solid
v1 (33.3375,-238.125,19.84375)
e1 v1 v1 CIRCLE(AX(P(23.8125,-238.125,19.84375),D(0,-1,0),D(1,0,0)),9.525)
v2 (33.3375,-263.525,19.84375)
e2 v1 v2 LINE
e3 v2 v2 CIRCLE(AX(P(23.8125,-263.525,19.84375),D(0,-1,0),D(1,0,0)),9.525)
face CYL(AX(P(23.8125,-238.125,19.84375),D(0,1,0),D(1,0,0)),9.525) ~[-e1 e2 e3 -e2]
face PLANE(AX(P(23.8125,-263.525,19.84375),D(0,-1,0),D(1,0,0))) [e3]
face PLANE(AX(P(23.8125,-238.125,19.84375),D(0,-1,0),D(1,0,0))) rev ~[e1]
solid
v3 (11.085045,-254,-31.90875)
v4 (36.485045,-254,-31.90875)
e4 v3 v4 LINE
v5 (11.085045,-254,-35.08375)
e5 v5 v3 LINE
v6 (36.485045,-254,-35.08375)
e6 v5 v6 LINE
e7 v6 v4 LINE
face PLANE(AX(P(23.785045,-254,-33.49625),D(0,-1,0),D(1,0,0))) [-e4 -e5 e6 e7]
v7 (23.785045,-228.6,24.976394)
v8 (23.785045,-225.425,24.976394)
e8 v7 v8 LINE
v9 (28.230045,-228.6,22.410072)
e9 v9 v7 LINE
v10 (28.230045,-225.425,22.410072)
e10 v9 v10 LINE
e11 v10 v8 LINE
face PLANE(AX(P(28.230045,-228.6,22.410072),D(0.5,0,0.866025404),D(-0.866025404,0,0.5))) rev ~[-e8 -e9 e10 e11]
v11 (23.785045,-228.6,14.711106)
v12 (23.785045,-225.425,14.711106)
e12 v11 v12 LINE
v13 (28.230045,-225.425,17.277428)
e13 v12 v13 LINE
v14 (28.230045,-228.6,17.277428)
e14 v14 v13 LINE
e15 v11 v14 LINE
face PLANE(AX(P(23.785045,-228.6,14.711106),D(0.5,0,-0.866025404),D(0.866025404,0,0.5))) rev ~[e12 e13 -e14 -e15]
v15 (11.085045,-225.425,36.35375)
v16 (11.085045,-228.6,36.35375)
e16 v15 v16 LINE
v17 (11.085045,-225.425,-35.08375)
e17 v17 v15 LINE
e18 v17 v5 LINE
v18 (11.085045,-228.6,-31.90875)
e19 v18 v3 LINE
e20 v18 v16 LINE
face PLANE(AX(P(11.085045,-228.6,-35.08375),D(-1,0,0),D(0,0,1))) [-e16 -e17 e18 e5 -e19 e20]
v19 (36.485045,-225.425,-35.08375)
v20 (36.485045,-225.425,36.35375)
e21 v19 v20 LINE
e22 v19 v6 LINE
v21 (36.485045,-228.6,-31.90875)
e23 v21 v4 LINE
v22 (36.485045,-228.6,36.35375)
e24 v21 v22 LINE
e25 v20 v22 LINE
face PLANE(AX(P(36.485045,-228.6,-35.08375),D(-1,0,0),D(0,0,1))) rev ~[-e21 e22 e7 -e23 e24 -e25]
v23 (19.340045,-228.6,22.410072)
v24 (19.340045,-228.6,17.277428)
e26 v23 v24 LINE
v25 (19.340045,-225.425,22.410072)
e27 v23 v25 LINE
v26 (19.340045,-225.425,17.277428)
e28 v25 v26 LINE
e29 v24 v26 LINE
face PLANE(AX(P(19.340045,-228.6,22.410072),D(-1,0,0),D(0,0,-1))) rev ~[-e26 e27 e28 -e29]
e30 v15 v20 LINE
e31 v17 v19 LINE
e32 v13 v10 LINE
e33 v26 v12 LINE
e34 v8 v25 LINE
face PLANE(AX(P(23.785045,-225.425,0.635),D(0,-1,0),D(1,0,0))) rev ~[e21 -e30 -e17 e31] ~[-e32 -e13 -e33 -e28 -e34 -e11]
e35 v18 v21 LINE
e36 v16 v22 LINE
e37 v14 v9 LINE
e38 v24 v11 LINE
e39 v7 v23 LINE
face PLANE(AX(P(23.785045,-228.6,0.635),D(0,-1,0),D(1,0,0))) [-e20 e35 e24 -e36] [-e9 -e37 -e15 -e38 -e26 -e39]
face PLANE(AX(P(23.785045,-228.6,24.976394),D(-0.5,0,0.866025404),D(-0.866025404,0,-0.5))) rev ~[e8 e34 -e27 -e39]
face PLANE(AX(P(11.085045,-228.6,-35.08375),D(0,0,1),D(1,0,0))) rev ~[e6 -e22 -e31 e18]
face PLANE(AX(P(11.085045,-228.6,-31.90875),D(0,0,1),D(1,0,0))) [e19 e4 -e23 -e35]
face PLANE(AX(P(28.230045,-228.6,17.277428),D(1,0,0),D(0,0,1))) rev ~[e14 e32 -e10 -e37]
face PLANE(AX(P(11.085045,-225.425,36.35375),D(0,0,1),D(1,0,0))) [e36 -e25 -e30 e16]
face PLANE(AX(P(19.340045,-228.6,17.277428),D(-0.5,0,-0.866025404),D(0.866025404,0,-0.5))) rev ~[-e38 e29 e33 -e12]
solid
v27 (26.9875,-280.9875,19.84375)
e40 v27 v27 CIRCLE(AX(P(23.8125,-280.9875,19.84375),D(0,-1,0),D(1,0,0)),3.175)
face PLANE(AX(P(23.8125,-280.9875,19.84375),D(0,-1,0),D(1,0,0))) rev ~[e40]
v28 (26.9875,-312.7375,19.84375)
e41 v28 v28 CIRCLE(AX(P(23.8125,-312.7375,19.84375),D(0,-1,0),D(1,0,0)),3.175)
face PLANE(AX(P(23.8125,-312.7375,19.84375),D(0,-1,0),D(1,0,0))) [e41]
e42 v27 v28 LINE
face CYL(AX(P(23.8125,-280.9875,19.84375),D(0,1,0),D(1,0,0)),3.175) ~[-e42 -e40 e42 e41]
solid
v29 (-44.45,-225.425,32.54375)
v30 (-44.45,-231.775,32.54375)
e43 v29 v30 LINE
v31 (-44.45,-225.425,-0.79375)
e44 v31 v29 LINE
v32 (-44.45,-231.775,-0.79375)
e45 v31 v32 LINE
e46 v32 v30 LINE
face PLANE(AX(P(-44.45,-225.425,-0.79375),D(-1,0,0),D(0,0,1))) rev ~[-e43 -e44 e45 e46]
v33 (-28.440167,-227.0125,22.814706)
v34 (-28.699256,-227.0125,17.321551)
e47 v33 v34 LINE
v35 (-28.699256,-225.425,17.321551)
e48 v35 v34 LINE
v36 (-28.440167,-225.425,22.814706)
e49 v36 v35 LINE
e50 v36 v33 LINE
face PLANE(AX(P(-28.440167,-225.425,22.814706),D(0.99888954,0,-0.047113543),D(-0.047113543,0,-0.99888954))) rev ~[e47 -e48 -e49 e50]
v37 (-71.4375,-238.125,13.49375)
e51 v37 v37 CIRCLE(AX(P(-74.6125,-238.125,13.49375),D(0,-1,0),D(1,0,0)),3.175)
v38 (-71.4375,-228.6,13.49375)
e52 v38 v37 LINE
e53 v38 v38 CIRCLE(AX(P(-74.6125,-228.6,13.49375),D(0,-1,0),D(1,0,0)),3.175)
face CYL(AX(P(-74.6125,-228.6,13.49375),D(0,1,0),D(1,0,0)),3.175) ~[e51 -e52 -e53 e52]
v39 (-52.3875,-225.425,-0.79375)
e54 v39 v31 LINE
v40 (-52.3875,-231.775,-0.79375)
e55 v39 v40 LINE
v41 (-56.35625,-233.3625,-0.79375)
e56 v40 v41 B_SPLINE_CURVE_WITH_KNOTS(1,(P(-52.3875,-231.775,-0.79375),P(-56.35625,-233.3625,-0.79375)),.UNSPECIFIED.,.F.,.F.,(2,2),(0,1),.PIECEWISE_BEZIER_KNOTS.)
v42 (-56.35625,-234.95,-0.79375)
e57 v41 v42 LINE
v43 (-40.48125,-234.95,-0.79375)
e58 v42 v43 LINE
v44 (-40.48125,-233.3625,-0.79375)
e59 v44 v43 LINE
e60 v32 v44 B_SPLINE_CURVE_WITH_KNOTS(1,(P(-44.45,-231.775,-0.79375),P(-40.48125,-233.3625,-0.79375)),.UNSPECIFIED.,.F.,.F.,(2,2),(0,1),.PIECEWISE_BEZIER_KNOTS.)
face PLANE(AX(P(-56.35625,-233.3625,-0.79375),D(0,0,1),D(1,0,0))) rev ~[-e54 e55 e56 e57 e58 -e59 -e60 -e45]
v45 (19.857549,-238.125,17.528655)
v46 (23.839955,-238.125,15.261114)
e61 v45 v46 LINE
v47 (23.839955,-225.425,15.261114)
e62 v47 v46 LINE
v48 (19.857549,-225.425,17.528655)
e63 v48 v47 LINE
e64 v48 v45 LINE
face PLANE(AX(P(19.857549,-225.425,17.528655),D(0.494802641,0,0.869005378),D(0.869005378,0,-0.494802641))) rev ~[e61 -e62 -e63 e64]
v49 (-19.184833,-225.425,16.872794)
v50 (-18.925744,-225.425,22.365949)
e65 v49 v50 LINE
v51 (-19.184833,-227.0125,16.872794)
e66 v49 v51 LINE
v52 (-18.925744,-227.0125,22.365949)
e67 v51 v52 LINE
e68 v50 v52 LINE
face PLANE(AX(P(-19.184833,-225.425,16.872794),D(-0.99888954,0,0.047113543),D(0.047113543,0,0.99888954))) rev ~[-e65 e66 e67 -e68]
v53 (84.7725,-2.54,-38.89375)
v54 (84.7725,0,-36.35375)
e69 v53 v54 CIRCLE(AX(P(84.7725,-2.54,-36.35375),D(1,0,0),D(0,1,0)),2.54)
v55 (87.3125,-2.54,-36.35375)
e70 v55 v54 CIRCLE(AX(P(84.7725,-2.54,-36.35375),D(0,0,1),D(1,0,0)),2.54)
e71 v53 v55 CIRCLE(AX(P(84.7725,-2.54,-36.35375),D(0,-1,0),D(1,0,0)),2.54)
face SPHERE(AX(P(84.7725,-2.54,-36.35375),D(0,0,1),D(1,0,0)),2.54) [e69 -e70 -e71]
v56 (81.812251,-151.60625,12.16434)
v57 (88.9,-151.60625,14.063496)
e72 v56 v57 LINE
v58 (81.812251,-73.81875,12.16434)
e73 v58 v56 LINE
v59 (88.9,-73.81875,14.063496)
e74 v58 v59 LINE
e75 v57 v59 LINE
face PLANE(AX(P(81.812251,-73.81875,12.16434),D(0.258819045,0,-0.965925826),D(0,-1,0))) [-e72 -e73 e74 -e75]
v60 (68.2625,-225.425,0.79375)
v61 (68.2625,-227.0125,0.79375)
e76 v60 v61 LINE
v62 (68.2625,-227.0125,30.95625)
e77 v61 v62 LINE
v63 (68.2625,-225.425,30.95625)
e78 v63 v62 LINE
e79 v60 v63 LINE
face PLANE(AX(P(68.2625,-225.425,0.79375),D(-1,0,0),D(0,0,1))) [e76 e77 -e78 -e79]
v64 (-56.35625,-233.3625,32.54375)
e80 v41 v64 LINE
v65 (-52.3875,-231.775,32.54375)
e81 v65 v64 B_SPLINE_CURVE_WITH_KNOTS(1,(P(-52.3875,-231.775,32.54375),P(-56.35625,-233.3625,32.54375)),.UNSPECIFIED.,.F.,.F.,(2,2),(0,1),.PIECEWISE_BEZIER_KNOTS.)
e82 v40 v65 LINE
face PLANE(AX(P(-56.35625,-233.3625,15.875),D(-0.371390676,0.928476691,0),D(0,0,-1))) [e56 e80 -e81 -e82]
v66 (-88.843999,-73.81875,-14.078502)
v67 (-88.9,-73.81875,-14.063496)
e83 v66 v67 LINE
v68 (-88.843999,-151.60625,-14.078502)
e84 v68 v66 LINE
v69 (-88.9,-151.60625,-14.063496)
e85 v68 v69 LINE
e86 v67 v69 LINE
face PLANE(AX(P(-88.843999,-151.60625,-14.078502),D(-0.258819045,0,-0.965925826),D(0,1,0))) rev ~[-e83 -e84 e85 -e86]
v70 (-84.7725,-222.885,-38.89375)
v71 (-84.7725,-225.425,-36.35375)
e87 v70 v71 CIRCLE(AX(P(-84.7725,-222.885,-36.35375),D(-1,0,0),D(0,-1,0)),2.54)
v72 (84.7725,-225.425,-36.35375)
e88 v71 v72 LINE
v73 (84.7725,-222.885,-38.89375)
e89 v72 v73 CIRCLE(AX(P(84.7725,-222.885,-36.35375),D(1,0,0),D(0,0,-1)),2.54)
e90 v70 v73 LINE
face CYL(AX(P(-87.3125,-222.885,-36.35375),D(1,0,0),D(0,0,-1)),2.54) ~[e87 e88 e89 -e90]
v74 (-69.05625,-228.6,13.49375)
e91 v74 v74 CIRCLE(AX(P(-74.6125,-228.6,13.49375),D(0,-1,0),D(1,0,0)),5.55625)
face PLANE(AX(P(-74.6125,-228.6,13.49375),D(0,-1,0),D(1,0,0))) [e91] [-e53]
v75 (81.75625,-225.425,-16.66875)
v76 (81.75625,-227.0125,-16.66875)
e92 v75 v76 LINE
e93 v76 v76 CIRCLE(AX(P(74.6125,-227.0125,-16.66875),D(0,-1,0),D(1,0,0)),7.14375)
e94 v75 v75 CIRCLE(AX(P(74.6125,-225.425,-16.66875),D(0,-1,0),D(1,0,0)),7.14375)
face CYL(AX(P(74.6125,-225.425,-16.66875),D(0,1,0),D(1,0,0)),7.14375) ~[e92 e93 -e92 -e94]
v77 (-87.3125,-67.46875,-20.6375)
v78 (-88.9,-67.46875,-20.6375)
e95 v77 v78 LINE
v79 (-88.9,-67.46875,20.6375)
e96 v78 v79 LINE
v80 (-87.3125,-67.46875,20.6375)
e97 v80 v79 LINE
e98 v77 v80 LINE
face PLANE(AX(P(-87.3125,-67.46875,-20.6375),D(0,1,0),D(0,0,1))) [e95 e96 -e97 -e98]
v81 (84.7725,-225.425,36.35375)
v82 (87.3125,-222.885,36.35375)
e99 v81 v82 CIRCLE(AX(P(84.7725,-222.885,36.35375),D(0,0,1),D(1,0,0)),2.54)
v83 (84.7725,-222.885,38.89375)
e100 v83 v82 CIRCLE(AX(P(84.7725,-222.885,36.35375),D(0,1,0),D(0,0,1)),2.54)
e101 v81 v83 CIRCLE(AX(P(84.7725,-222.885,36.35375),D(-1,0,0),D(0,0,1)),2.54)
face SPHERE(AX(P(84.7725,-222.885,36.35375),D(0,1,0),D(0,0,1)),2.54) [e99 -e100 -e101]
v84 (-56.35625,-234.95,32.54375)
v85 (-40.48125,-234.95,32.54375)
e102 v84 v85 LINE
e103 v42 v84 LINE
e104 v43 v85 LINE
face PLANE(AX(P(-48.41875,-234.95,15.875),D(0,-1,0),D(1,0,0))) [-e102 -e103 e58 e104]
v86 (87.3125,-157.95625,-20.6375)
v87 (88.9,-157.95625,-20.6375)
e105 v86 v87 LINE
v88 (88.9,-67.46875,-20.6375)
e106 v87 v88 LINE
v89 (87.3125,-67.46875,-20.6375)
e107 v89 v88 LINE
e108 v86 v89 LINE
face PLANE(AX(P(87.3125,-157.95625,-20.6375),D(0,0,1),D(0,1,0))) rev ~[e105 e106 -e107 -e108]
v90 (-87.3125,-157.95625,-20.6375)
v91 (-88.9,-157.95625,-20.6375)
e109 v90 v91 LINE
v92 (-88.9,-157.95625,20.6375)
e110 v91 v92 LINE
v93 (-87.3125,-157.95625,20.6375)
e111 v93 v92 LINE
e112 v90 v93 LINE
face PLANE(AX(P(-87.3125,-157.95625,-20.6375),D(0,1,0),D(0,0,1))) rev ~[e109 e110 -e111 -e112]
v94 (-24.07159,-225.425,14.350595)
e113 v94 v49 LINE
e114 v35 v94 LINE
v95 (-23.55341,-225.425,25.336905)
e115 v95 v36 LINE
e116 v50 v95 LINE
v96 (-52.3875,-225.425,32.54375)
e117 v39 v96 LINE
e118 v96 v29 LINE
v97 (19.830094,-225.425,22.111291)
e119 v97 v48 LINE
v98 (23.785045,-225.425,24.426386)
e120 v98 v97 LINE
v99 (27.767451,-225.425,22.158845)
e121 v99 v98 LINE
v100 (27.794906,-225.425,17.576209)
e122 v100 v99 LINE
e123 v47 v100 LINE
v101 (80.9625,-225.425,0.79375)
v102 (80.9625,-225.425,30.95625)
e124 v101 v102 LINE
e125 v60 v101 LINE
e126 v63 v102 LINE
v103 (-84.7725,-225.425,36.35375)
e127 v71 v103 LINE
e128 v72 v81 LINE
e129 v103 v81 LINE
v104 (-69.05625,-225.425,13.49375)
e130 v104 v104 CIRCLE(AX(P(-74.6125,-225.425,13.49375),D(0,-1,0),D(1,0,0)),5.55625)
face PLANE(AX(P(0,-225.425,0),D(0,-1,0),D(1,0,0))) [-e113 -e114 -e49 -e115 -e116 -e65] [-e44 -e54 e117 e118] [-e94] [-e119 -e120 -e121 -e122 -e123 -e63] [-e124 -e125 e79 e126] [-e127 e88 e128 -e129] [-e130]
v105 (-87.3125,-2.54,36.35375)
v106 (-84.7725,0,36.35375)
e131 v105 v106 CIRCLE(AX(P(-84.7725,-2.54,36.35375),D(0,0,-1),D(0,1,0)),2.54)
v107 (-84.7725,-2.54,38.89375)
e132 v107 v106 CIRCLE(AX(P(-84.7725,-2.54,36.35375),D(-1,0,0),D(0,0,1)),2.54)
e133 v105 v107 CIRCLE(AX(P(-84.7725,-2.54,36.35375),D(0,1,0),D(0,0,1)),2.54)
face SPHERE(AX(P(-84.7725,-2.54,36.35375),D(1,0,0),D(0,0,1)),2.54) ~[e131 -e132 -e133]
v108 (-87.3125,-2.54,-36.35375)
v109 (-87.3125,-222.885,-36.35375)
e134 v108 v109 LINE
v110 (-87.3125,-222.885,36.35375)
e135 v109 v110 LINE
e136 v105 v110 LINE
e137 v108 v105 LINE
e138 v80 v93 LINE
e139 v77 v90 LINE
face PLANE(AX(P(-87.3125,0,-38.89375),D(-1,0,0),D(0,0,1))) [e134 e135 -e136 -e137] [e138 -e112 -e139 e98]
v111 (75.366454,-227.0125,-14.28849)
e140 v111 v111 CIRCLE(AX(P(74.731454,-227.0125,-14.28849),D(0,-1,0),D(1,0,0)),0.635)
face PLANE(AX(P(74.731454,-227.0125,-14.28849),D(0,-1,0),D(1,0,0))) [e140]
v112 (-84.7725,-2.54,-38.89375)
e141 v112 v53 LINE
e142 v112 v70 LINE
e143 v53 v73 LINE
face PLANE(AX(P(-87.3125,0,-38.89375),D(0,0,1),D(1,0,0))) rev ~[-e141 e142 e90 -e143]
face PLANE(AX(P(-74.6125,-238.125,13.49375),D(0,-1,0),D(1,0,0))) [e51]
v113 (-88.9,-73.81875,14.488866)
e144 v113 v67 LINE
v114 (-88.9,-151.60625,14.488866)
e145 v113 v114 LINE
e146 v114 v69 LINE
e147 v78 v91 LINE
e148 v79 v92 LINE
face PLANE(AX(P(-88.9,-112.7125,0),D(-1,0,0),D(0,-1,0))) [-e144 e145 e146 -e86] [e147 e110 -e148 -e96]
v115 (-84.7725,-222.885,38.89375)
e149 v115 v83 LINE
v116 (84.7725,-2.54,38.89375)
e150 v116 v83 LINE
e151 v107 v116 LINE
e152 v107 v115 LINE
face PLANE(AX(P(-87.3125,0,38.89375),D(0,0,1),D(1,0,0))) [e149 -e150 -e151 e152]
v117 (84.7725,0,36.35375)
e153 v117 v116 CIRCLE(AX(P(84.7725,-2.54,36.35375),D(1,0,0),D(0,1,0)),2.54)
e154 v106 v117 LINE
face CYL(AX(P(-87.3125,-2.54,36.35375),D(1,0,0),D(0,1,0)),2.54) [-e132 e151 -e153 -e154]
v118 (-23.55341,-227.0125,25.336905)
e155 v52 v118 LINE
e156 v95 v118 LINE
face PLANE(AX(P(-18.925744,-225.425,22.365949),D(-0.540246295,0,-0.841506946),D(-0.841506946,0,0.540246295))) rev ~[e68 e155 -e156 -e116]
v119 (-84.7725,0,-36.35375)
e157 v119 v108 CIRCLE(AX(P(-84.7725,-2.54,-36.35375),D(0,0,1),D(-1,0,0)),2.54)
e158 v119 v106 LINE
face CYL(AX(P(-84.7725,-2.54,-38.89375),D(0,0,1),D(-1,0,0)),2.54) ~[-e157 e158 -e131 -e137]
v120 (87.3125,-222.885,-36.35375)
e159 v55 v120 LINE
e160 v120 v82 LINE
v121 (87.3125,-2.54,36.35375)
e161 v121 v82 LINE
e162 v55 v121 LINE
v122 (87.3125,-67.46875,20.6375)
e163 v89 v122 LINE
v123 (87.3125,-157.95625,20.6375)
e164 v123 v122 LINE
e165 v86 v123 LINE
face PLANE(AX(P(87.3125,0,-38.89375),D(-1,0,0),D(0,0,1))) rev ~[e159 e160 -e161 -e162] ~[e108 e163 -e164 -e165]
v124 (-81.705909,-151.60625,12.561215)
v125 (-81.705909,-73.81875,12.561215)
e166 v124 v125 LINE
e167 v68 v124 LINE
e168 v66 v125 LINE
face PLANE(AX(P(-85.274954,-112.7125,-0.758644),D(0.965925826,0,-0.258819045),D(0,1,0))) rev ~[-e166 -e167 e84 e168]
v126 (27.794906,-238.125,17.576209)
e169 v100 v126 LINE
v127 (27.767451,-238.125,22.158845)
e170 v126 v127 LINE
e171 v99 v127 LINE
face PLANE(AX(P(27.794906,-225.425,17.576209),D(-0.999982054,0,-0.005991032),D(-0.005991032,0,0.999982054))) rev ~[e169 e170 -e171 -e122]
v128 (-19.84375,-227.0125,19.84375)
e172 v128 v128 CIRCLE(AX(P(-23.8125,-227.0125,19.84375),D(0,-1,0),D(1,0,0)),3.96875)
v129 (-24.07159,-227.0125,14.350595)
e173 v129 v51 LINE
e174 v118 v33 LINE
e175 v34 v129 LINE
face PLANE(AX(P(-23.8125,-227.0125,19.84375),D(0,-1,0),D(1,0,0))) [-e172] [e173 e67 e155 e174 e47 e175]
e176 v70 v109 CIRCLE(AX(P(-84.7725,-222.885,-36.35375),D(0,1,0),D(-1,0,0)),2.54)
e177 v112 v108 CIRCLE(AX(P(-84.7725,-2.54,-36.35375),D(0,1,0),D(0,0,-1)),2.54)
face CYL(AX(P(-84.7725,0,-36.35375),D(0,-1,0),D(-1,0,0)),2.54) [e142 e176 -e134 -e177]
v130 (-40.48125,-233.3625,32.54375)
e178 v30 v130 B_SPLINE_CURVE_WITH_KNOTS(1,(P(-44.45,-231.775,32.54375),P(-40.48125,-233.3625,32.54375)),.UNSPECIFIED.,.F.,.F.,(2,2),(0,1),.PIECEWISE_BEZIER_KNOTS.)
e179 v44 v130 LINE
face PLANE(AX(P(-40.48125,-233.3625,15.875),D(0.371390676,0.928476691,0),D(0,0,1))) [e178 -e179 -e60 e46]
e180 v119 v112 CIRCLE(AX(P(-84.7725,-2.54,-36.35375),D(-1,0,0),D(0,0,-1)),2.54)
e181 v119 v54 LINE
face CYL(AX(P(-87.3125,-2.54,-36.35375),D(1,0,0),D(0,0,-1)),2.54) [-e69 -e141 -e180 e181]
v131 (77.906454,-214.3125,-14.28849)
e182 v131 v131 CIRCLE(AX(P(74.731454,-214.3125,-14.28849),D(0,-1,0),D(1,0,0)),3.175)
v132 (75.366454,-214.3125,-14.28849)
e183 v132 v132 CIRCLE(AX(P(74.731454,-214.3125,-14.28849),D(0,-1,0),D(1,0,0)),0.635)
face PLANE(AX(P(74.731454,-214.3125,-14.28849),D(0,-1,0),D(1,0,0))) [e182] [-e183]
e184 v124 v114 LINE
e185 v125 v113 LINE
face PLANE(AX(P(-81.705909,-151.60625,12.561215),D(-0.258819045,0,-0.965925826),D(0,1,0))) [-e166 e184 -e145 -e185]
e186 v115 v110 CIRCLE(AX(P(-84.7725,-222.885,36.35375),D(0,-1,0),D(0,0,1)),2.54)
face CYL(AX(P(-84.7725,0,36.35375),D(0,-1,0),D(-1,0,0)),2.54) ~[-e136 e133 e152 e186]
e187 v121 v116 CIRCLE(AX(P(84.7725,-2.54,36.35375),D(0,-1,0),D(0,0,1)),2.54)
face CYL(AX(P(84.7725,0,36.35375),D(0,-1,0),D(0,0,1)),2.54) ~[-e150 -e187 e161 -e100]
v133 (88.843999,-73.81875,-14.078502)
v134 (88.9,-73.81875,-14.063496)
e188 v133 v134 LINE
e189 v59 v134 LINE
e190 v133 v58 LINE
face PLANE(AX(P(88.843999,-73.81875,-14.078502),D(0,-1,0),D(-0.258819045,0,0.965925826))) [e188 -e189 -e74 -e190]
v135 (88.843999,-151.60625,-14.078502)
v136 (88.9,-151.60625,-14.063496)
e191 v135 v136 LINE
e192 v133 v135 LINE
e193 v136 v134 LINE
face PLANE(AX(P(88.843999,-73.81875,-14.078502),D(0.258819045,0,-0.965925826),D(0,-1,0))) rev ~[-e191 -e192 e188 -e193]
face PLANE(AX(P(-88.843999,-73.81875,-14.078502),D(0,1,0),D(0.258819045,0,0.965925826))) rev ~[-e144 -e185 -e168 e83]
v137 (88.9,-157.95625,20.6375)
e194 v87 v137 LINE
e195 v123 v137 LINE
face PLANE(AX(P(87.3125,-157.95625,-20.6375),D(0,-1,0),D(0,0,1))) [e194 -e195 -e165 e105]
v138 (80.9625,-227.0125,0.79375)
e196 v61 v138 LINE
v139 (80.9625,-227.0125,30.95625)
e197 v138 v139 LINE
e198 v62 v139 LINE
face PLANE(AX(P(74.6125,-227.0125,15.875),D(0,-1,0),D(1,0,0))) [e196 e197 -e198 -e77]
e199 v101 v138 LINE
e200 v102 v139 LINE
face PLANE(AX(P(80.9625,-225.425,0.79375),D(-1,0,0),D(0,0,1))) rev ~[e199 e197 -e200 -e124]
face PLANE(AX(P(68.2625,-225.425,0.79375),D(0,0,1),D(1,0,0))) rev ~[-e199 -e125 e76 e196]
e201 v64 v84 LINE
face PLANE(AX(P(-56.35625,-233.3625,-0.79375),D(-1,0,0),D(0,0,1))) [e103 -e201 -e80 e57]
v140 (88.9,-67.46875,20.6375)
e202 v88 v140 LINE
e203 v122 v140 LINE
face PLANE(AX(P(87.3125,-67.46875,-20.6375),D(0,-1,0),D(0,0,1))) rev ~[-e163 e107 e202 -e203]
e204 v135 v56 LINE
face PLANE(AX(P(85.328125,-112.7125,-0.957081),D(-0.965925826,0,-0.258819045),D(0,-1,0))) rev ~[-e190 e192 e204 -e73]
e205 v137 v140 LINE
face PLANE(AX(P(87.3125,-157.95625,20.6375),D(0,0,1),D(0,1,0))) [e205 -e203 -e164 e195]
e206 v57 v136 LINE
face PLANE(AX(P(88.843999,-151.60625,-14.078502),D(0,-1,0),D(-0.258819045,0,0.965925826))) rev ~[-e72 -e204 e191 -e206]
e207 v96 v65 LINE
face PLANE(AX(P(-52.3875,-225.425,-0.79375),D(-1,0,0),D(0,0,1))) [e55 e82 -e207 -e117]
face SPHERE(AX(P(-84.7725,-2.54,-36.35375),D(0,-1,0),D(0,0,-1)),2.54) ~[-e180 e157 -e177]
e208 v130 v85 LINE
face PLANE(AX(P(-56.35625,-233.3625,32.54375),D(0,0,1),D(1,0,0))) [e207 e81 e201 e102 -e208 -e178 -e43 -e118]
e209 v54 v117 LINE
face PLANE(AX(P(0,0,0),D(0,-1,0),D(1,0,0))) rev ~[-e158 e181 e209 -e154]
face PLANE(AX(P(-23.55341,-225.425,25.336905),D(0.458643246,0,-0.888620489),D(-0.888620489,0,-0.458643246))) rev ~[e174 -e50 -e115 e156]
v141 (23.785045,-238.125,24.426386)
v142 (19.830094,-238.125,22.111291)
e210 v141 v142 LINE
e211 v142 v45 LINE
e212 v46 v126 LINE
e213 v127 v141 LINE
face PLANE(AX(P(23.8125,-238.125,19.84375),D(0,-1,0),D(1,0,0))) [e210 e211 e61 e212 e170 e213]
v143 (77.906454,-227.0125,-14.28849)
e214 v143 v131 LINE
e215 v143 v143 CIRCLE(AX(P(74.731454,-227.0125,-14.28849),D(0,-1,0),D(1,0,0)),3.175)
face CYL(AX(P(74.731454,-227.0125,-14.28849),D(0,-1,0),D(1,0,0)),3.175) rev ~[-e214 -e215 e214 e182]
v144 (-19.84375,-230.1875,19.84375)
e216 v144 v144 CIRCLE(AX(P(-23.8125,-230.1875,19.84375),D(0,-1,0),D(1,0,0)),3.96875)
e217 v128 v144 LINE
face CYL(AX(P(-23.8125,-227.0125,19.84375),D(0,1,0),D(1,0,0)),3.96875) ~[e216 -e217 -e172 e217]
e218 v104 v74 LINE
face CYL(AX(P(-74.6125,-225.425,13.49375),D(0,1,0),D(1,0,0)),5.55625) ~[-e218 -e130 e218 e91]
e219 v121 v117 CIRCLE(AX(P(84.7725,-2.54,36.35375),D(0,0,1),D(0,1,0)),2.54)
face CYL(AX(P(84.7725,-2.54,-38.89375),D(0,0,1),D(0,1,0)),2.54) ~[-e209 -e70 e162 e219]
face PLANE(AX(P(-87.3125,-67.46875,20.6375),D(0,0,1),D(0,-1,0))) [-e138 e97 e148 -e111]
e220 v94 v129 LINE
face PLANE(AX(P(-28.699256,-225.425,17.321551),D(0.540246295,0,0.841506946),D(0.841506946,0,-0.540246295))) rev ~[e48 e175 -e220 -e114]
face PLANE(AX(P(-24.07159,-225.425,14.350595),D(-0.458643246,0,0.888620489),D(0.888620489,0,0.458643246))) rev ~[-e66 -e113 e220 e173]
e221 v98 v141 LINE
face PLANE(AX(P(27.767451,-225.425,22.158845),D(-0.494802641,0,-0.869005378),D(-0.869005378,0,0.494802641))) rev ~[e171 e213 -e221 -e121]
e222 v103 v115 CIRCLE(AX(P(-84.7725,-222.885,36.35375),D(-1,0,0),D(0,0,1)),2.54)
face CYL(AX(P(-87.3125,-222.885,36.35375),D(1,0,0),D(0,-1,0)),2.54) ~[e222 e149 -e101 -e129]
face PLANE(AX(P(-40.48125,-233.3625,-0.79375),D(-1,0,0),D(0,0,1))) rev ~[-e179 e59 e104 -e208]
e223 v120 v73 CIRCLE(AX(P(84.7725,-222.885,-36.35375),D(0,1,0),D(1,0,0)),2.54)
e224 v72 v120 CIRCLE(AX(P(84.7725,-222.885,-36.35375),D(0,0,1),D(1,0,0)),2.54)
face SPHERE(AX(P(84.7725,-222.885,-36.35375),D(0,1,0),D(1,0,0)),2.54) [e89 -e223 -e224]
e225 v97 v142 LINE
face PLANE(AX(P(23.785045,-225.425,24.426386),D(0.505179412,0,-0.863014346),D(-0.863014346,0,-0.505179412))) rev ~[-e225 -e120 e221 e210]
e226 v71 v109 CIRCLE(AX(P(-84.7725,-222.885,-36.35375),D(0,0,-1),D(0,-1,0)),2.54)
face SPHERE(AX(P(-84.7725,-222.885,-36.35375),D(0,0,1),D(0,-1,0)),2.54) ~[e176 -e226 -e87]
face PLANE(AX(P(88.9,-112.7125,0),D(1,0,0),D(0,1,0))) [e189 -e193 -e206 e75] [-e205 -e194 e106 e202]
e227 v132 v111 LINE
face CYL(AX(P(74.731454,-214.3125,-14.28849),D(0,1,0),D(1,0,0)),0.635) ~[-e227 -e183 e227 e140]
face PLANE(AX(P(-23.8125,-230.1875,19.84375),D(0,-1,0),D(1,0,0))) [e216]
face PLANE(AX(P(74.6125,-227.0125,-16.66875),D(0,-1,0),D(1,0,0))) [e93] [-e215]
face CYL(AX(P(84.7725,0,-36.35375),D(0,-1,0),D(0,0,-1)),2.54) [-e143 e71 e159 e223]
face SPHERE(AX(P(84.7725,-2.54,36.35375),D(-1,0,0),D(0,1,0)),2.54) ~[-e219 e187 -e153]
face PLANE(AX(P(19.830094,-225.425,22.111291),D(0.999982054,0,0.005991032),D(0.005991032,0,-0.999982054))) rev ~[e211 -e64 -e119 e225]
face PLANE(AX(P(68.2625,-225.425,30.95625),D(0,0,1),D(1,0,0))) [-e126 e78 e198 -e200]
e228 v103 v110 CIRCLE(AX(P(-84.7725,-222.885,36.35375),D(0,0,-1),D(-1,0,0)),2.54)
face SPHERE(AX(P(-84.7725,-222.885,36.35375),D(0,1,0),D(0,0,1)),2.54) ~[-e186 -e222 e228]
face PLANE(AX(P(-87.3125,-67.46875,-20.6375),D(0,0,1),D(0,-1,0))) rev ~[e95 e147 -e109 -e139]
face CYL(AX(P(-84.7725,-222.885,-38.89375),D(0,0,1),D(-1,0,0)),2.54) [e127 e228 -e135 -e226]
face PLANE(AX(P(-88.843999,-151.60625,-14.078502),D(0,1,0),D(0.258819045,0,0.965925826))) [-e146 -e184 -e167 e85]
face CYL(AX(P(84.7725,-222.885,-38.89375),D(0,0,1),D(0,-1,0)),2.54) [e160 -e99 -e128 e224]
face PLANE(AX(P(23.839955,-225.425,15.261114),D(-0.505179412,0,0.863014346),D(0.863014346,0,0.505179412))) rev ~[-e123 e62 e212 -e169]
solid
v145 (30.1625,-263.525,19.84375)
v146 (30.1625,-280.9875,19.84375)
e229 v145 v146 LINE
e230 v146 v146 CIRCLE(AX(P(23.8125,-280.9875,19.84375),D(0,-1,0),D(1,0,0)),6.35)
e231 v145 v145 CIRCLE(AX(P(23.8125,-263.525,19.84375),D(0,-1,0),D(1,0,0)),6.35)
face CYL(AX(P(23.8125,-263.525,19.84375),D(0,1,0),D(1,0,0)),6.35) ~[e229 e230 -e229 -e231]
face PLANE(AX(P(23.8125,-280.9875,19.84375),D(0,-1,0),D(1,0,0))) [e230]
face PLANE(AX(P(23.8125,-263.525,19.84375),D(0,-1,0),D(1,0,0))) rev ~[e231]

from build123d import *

# Parameters (mm, degrees)
F0_W       = 174.625
F0_H       = 77.7875
F1_DEPTH   = 225.425
F2_W       = 90.4875
F2_H       = 41.275
F3_DEPTH   = 1.5875
F4_W       = 90.4875
F4_H       = 41.275
F5_DEPTH   = 1.5875
F6_R       = 2.54
F9_W       = 77.7875
F9_H       = 27.5794637142
F10_DEPTH  = 25.4
F13_W      = 77.7875
F13_H      = 27.1685884801
F14_DEPTH  = 25.4
F15_R      = 7.14375
F16_DEPTH  = 1.5875
F17_R      = 3.175
F18_DEPTH  = 12.7
F19_R      = 0.635
F20_DEPTH  = 12.7
F21_W      = 12.7
F21_H      = 30.1625
F22_DEPTH  = 1.5875
F24_DEPTH  = 12.7
F25_R      = 9.525
F26_DEPTH  = 25.4
F27_R      = 6.35
F28_DEPTH  = 17.4625
F29_R      = 3.175
F30_DEPTH  = 31.75
F32_DEPTH  = 1.5875
F33_R      = 3.96875
F34_DEPTH  = 3.175
F35_W      = 7.9375
F35_H      = 33.3375
F36_DEPTH  = 6.35
F36_FACE_W = 7.9375
F36_FACE_H = 33.3375
F38_W      = 15.875
F38_H      = 33.3375
F40_W      = 15.875
F40_H      = 33.3375
F41_DEPTH  = 1.5875
F42_R      = 5.55625
F43_DEPTH  = 3.175
F44_R      = 3.175
F45_DEPTH  = 9.525
F46_W      = 25.4
F46_H      = 71.4375
F47_DEPTH  = 3.175
F49_DEPTH  = 228.601
F50_W      = 25.4
F50_H      = 3.175
F51_DEPTH  = 25.4


with BuildPart() as f1:
    # F0 (on Front) → F1 (new body)
    with BuildSketch(Plane.XZ):
        Rectangle(F0_W, F0_H)
    extrude(amount=F1_DEPTH)

    # F2 (on face) → F3 (join)
    with BuildSketch(Plane(origin=(-87.3125, 0, 0), x_dir=(0, -1, 0), z_dir=(-1, 0, 0))):
        with Locations((112.7125, 0)):
            Rectangle(F2_W, F2_H)
    extrude(amount=F3_DEPTH)

    # F4 (on face) → F5 (join)
    with BuildSketch(Plane.YZ.offset(87.3125)):
        with Locations((-112.7125, 0)):
            Rectangle(F4_W, F4_H)
    extrude(amount=F5_DEPTH)

    # F6
    f6_edges = [f1.edges().sort_by_distance(p)[0] for p in [
        (0, 0, 38.89375),
        (87.3125, 0, 0),
        (87.3125, -112.7125, 38.89375),
        (87.3125, -112.7125, -38.89375),
        (-87.3125, -112.7125, 38.89375),
        (0, -225.425, 38.89375),
        (87.3125, -225.425, 0),
        (-87.3125, -225.425, 0),
        (0, -225.425, -38.89375),
        (-87.3125, -112.7125, -38.89375),
        (0, 0, -38.89375),
        (-87.3125, 0, 0),
    ]]
    fillet(f6_edges, radius=F6_R)

    # F9 (on face) → F10 (cut)
    with BuildSketch(Plane(origin=(-79.3729541982, 0, 21.2679189783), x_dir=(0, 1, 0), z_dir=(0.9659258263, 0, -0.2588190451))):
        with Locations((-112.7125, -22.8035754926)):
            Rectangle(F9_W, F9_H)
    extrude(amount=-F10_DEPTH, mode=Mode.SUBTRACT)

    # F13 (on face) → F14 (cut)
    with BuildSketch(Plane(origin=(79.3729541982, 0, 21.2679189783), x_dir=(0, -1, 0), z_dir=(-0.9659258263, 0, -0.2588190451))):
        with Locations((112.7125, -23.0090131096)):
            Rectangle(F13_W, F13_H)
    extrude(amount=-F14_DEPTH, mode=Mode.SUBTRACT)

    # F15 (on face) → F16 (join)
    with BuildSketch(Plane.XZ.offset(225.425)):
        with Locations((74.6125, -16.66875)):
            Circle(F15_R)
    extrude(amount=F16_DEPTH)

    # F17 (on face) → F18 (cut)
    with BuildSketch(Plane.XZ.offset(227.0125)):
        with Locations((74.7314542532, -14.2884904529)):
            Circle(F17_R)
    extrude(amount=-F18_DEPTH, mode=Mode.SUBTRACT)

    # F19 (on face) → F20 (join)
    with BuildSketch(Plane.XZ.offset(214.3125)):
        with Locations((74.7314542532, -14.2884904529)):
            Circle(F19_R)
    extrude(amount=F20_DEPTH)

    # F21 (on face) → F22 (join)
    with BuildSketch(Plane.XZ.offset(225.425)):
        with Locations((74.6125, 15.875)):
            Rectangle(F21_W, F21_H)
    extrude(amount=F22_DEPTH)

    # F23 (on face) → F24 (join)
    with BuildSketch(Plane.XZ.offset(225.425)):
        Polygon((23.839955207, 15.2611144816), (27.7949063788, 17.5762091475), (27.7674511717, 22.158844666), (23.785044793, 24.4263855184), (19.8300936212, 22.1112908525), (19.8575488283, 17.528655334), align=None)
    extrude(amount=F24_DEPTH)

    # F31 (on face) → F32 (join)
    with BuildSketch(Plane.XZ.offset(225.425)):
        Polygon((-24.0715896818, 14.350595393), (-19.1848334043, 16.8727944502), (-18.9257437225, 22.3659490572), (-23.5534103182, 25.336904607), (-28.4401665957, 22.8147055498), (-28.6992562775, 17.3215509428), align=None)
    extrude(amount=F32_DEPTH)

    # F33 (on face) → F34 (join)
    with BuildSketch(Plane.XZ.offset(227.0125)):
        with Locations((-23.8125, 19.84375)):
            Circle(F33_R)
    extrude(amount=F34_DEPTH)

    # F35 (on face) → F36 (join)
    with BuildSketch(Plane.XZ.offset(225.425)):
        with Locations((-48.41875, 15.875)):
            Rectangle(F35_W, F35_H)
    extrude(amount=F36_DEPTH)

    # F36_face (on face) → F39 section 0
    with BuildSketch(Plane(origin=(-48.41875, -231.775, 15.875), x_dir=(1, 0, 0), z_dir=(0, -1, 0))):
        Rectangle(F36_FACE_W, F36_FACE_H)
    # F38 (on offset) → F39 section 1
    with BuildSketch(Plane.XZ.offset(233.3625)):
        with Locations((-48.41875, 15.875)):
            Rectangle(F38_W, F38_H)
    loft()

    # F40 (on face) → F41 (join)
    with BuildSketch(Plane.XZ.offset(233.3625)):
        with Locations((-48.41875, 15.875)):
            Rectangle(F40_W, F40_H)
    extrude(amount=F41_DEPTH)

    # F42 (on face) → F43 (join)
    with BuildSketch(Plane.XZ.offset(225.425)):
        with Locations((-74.6125, 13.49375)):
            Circle(F42_R)
    extrude(amount=F43_DEPTH)

    # F44 (on face) → F45 (join)
    with BuildSketch(Plane.XZ.offset(228.6)):
        with Locations((-74.6125, 13.49375)):
            Circle(F44_R)
    extrude(amount=F45_DEPTH)


with BuildPart() as f26:
    # F25 (on face) → F26 (new body)
    with BuildSketch(Plane.XZ.offset(238.125)):
        with Locations((23.8125, 19.84375)):
            Circle(F25_R)
    extrude(amount=F26_DEPTH)


with BuildPart() as f28:
    # F27 (on face) → F28 (new body)
    with BuildSketch(Plane.XZ.offset(263.525)):
        with Locations((23.8125, 19.84375)):
            Circle(F27_R)
    extrude(amount=F28_DEPTH)


with BuildPart() as f30:
    # F29 (on face) → F30 (new body)
    with BuildSketch(Plane.XZ.offset(280.9875)):
        with Locations((23.8125, 19.84375)):
            Circle(F29_R)
    extrude(amount=F30_DEPTH)


with BuildPart() as f47:
    # F46 (on face) → F47 (new body)
    with BuildSketch(Plane.XZ.offset(225.425)):
        with Locations((23.785044793, 0.635)):
            Rectangle(F46_W, F46_H)
    extrude(amount=F47_DEPTH)

    # F48 (on face) → F49 (cut, through all)
    with BuildSketch(Plane.XZ.offset(228.6)):
        Polygon((23.785044793, 14.7111061069), (28.230044793, 17.2774280535), (28.230044793, 22.4100719465), (23.785044793, 24.9763938931), (19.340044793, 22.4100719465), (19.340044793, 17.2774280535), align=None)
    extrude(amount=-F49_DEPTH, mode=Mode.SUBTRACT)

    # F50 (on face) → F51 (join)
    with BuildSketch(Plane.XZ.offset(228.6)):
        with Locations((23.785044793, -33.49625)):
            Rectangle(F50_W, F50_H)
    extrude(amount=F51_DEPTH)


solid = Compound([f1.part, f26.part, f28.part, f30.part, f47.part])
